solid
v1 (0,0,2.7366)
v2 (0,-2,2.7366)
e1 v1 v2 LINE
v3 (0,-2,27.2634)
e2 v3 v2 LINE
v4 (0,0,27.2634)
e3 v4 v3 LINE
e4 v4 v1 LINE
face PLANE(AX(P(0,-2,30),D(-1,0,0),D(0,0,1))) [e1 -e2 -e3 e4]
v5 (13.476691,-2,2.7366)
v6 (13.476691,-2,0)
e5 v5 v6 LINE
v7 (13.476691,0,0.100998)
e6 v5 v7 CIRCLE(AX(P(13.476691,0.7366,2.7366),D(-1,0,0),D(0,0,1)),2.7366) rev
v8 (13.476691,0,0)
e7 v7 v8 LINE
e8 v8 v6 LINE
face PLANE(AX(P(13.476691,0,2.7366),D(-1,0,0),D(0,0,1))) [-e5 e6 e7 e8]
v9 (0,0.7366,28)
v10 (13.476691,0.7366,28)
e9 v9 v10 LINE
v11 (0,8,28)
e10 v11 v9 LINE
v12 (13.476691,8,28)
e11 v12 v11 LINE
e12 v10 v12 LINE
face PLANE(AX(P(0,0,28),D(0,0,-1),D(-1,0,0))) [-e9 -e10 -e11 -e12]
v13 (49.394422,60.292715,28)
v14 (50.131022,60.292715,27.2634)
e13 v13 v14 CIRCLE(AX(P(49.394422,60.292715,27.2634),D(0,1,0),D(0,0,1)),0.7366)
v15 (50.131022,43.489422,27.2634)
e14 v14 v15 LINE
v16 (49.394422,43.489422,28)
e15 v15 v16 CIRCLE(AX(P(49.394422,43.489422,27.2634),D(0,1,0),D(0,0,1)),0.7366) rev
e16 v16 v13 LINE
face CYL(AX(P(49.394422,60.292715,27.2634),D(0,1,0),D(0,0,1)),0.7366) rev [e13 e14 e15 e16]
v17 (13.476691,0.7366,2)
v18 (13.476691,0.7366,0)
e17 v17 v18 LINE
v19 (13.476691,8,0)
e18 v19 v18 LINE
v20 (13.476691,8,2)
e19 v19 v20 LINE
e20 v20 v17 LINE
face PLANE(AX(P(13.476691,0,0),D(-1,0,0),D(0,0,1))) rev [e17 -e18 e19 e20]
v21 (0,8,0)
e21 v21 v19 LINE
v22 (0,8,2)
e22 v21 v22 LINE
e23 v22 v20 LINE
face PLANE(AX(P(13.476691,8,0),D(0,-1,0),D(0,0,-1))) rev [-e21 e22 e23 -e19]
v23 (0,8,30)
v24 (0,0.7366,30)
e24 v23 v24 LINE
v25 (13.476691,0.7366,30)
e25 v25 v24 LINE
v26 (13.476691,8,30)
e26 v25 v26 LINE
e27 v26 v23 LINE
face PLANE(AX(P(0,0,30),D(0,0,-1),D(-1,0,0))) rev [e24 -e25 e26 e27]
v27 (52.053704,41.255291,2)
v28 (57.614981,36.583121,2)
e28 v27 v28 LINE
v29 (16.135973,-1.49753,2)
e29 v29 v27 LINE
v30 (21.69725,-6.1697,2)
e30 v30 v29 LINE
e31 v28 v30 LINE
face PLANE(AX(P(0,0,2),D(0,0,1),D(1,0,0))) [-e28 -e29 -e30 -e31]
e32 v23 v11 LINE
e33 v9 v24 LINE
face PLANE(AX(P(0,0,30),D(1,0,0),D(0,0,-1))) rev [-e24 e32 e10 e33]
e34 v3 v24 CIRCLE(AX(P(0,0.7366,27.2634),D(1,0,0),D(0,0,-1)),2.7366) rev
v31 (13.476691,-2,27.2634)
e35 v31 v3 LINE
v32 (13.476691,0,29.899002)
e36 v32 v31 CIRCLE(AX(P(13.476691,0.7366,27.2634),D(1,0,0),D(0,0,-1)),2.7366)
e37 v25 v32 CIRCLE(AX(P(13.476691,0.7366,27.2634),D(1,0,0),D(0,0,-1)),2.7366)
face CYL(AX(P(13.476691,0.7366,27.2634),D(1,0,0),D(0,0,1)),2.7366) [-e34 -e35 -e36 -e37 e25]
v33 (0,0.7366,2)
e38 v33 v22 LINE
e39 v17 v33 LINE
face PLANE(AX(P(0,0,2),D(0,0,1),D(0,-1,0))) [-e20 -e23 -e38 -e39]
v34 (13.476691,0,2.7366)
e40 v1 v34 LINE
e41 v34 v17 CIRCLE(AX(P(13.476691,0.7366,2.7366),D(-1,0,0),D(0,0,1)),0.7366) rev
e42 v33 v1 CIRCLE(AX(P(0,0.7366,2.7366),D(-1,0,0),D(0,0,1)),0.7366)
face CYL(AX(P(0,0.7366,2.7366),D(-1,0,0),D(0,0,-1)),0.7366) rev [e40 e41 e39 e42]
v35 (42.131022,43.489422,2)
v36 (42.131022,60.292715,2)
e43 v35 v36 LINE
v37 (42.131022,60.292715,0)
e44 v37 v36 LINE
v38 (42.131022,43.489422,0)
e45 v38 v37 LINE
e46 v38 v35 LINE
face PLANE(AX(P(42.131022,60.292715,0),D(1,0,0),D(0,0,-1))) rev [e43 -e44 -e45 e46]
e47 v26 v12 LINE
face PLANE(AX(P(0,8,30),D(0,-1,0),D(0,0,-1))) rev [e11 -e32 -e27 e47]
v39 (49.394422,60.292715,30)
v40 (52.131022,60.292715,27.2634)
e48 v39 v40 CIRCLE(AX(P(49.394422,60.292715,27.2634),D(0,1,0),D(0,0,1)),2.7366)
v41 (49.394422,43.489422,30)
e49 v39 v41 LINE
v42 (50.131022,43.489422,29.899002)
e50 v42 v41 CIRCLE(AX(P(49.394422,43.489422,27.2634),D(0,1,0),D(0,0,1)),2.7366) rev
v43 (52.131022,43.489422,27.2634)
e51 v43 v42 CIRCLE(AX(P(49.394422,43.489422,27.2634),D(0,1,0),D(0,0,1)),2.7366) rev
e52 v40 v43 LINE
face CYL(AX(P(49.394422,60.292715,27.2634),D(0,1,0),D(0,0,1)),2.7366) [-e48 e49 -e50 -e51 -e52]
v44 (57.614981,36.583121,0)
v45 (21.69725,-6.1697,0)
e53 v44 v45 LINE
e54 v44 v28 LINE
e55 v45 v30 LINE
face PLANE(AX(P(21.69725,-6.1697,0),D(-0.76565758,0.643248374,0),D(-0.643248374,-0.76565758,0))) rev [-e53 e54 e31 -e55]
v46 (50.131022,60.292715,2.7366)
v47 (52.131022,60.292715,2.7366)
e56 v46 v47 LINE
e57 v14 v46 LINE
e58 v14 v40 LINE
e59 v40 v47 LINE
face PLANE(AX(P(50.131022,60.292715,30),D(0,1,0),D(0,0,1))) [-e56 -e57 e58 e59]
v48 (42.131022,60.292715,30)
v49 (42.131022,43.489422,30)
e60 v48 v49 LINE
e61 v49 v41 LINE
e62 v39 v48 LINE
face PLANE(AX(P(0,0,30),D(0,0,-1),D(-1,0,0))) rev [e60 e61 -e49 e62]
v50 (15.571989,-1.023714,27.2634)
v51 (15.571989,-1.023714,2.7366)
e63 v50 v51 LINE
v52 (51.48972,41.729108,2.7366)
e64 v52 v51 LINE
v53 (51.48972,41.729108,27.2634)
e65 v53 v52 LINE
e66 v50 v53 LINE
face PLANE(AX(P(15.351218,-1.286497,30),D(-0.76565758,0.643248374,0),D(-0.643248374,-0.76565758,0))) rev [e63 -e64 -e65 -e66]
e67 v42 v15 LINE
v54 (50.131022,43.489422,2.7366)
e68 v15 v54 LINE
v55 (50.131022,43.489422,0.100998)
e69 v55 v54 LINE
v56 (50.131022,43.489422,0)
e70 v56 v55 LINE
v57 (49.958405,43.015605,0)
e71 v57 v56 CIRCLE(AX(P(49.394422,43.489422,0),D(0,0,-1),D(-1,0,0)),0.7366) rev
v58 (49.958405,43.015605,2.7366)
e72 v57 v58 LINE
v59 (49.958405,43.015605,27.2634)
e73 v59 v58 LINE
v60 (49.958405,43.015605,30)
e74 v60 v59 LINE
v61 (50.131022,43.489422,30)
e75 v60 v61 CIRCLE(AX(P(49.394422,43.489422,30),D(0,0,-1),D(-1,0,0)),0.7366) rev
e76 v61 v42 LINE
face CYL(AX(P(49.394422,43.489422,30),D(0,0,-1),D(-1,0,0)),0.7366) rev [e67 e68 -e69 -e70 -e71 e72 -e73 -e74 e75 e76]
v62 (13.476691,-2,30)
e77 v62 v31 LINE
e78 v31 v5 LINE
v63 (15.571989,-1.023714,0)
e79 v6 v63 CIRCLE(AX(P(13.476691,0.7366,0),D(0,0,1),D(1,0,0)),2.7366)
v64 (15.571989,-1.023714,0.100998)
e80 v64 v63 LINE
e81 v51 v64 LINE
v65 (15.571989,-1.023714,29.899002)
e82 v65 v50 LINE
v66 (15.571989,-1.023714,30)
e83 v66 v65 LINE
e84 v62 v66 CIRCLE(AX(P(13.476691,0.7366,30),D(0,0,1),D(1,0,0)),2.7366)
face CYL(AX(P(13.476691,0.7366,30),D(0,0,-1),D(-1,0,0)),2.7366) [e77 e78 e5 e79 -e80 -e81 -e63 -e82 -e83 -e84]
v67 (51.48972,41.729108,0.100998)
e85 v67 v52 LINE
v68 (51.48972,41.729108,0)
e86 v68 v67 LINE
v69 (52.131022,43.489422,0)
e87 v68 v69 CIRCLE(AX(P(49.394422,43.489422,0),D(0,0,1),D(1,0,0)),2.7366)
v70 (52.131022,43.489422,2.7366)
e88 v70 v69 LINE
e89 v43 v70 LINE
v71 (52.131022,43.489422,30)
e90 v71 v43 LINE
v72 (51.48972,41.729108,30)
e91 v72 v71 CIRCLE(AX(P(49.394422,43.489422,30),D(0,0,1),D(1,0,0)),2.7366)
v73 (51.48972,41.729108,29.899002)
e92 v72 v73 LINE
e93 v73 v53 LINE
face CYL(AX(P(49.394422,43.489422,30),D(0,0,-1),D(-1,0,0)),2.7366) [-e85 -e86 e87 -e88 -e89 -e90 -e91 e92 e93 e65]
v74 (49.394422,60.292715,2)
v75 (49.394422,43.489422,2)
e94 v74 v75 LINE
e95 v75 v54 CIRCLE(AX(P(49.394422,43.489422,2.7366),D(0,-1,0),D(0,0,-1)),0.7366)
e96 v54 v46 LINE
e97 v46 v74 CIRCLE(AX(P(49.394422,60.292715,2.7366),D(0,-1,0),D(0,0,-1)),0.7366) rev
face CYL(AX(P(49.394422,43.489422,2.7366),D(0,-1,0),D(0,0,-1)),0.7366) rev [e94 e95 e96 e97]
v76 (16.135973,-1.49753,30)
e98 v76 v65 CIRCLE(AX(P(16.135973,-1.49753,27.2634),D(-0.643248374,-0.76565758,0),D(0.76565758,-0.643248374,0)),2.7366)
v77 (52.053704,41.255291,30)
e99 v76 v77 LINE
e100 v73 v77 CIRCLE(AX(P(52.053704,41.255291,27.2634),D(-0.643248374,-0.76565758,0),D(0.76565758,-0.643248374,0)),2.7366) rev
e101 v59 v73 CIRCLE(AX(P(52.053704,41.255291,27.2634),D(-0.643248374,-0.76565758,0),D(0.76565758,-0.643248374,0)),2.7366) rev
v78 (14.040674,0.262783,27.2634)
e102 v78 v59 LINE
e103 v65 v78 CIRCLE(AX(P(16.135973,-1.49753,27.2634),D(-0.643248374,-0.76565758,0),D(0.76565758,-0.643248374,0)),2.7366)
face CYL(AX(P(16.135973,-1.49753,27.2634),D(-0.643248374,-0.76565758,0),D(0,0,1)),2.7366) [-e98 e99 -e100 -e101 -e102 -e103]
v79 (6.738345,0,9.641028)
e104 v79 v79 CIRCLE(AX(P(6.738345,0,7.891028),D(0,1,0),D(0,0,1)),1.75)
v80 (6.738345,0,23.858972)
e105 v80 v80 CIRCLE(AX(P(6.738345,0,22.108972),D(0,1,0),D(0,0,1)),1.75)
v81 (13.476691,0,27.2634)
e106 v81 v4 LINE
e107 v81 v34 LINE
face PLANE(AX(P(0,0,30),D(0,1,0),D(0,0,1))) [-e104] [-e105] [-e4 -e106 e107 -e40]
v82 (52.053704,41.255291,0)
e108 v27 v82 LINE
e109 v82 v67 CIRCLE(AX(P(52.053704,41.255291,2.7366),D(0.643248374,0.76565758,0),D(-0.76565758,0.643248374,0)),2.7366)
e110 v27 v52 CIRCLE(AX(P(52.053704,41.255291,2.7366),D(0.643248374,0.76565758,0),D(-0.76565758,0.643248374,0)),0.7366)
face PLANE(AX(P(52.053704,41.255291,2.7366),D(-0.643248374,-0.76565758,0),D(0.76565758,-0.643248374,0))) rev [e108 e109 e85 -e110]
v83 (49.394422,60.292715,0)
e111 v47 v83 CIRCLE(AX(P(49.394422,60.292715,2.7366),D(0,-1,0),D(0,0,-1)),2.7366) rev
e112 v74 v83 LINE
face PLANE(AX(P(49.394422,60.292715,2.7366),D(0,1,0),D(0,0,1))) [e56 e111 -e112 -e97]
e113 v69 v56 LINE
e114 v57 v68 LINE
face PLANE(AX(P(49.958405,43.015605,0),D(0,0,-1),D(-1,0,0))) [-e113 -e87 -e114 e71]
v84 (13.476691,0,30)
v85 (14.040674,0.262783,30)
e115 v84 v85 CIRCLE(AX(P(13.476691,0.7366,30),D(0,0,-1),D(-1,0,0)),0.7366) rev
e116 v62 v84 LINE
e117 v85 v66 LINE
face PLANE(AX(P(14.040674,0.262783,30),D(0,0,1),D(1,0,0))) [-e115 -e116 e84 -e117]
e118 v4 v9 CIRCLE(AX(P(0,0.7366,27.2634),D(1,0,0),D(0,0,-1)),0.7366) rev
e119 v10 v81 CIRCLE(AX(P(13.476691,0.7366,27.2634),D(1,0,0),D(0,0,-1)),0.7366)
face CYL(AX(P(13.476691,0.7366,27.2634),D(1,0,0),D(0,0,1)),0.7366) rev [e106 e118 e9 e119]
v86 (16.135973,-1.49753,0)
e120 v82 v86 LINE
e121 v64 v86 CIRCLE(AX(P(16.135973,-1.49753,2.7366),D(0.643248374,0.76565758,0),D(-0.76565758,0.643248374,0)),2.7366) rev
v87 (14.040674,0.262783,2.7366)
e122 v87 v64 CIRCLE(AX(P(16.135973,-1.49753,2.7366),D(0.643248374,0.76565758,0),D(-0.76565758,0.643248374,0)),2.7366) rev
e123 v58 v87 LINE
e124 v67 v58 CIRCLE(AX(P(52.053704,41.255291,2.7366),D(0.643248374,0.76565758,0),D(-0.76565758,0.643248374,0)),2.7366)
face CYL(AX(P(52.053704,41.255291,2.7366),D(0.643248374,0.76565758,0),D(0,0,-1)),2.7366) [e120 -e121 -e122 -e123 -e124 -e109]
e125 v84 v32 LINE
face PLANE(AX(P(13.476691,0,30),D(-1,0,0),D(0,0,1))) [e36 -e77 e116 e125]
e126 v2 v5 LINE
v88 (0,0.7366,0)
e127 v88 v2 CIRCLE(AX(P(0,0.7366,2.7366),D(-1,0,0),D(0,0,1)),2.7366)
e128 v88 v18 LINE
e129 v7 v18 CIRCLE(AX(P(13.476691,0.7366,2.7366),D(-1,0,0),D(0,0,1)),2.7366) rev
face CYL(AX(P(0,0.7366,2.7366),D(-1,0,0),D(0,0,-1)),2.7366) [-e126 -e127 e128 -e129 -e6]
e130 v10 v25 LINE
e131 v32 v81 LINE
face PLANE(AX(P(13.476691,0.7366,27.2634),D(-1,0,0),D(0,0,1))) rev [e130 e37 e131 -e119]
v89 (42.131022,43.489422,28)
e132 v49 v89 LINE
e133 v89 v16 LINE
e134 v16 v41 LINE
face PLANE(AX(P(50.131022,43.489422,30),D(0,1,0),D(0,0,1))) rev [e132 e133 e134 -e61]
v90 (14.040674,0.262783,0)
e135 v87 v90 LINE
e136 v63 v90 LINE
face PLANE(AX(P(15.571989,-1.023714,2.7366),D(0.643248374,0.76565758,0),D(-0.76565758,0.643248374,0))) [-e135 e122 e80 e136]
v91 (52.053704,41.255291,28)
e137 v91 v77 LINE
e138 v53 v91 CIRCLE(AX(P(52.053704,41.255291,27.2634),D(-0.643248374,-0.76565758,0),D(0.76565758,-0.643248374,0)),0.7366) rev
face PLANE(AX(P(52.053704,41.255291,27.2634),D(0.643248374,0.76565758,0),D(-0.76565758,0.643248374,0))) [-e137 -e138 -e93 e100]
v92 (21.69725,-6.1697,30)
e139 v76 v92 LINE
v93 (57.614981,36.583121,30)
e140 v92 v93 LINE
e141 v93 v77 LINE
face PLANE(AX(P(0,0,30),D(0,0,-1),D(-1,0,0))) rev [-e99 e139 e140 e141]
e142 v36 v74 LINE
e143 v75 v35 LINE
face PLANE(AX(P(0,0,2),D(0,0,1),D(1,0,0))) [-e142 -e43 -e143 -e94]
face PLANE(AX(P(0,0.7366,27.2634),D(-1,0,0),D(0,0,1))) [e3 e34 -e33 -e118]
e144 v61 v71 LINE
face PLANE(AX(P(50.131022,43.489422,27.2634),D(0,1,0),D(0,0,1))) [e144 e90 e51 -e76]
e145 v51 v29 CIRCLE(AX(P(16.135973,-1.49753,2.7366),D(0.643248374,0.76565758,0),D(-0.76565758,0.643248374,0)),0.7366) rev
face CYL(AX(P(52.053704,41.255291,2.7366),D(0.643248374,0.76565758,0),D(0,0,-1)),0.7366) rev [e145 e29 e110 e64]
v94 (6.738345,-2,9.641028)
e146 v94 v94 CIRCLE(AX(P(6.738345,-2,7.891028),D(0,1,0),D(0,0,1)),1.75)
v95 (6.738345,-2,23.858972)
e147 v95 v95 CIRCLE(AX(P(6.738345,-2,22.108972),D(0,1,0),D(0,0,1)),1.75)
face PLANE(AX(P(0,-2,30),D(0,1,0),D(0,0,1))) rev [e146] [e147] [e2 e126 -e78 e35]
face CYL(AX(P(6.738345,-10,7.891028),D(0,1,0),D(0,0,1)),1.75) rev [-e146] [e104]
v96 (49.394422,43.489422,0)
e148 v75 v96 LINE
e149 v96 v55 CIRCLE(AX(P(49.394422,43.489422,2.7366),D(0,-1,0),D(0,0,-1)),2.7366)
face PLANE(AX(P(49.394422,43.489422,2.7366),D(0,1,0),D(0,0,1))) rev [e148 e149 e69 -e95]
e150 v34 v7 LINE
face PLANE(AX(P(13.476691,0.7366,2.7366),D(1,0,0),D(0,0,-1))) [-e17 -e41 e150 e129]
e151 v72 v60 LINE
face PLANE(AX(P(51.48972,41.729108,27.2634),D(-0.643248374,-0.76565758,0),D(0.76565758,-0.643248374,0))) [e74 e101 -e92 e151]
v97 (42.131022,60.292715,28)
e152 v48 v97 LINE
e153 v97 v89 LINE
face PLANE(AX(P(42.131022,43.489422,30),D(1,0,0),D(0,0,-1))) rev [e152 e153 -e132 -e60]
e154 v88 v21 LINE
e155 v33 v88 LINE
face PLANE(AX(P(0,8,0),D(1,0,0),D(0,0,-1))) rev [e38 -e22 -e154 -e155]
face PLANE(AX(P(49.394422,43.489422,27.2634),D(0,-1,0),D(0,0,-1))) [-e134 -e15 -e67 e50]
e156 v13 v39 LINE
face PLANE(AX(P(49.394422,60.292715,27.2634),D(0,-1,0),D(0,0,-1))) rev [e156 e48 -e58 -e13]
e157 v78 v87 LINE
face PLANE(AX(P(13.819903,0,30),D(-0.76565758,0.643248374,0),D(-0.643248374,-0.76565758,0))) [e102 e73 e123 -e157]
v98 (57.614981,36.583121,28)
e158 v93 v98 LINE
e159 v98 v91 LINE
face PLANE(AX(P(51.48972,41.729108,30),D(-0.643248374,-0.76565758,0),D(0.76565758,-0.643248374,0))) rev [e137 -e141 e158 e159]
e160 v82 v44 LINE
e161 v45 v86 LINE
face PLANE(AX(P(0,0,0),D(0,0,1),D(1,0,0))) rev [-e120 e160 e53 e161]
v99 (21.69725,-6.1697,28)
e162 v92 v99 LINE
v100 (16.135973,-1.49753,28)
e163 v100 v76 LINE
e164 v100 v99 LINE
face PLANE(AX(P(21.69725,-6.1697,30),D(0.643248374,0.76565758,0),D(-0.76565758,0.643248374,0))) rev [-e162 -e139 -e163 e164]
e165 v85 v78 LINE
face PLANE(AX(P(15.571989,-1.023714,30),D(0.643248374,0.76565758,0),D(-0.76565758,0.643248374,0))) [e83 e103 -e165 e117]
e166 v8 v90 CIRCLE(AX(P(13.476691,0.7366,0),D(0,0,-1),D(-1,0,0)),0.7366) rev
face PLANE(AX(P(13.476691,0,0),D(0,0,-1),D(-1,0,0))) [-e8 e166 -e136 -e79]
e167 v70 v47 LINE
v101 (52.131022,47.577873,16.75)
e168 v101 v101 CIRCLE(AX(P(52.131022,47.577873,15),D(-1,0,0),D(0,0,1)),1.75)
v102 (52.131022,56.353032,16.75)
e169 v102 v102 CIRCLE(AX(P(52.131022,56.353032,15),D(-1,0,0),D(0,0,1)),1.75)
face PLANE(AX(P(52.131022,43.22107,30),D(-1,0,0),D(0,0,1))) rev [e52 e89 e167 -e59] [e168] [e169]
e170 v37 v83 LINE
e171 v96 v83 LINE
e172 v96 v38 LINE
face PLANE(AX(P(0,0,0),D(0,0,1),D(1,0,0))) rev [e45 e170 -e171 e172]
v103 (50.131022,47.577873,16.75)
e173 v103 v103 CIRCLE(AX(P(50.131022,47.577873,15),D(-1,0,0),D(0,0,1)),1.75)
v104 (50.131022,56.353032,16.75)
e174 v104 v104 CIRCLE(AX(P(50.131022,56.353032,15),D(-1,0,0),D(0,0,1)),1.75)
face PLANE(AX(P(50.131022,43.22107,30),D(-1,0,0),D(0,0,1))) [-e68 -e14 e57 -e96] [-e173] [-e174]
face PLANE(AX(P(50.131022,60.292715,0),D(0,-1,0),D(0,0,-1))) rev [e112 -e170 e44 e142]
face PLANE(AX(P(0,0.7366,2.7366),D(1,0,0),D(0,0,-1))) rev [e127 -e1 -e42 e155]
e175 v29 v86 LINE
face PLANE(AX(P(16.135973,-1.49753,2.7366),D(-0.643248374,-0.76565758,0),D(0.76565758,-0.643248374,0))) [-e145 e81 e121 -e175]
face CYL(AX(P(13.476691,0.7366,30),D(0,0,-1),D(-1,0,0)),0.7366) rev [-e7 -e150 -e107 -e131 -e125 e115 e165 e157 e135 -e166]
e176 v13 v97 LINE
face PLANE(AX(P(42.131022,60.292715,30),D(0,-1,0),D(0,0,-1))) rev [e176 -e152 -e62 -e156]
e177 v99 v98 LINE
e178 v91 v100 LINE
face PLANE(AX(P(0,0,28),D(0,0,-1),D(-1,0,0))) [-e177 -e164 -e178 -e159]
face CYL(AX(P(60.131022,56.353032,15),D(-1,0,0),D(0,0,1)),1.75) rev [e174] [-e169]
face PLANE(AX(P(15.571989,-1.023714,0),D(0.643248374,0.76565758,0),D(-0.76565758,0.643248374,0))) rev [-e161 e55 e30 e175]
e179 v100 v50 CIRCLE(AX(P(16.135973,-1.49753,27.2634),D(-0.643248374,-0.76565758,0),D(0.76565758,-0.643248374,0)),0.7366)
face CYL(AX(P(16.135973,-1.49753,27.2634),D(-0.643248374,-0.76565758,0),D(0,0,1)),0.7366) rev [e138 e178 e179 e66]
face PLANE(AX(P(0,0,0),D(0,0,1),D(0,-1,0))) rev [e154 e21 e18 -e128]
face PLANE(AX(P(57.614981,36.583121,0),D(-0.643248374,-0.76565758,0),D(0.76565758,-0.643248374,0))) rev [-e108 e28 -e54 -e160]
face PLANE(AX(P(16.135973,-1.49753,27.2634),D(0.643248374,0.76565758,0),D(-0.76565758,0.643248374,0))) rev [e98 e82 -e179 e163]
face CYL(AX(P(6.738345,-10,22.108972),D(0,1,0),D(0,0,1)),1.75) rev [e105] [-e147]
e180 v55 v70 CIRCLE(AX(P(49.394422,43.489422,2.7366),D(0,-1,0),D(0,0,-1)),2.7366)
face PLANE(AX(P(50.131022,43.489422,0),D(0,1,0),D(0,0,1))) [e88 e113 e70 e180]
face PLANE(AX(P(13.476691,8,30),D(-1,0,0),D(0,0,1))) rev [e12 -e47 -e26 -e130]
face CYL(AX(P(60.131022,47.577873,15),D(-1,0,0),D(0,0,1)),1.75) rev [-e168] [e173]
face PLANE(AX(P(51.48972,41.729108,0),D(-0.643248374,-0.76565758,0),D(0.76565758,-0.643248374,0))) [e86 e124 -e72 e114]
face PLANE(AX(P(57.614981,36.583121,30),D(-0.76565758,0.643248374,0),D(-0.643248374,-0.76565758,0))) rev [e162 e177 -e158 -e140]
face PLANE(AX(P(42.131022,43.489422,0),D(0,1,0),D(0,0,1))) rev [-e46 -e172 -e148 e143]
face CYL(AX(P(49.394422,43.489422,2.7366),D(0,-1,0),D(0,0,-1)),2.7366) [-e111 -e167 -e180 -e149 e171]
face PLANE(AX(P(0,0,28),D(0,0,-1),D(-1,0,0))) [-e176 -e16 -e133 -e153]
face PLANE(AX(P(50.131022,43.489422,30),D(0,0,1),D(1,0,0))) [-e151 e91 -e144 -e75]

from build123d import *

# Parameters (mm, degrees)
BASE_FLANGE1_DEPTH             = 30
EDGE_FLANGE1_STRIP_W           = 9.4732
EDGE_FLANGE1_STRIP_H           = 2
EDGE_FLANGE1_STRIP_CUT_DEPTH   = 16.803293835
EDGE_FLANGE1_STRIP_2_W         = 9.4732
EDGE_FLANGE1_STRIP_2_H         = 2
EDGE_FLANGE1_STRIP_CUT_2_DEPTH = 13.476690823
EDGE_FLANGE1_STRIP_3_W         = 9.4732
EDGE_FLANGE1_STRIP_3_H         = 2
EDGE_FLANGE1_STRIP_CUT_3_DEPTH = 16.803293835
EDGE_FLANGE1_STRIP_4_W         = 9.4732
EDGE_FLANGE1_STRIP_4_H         = 2
EDGE_FLANGE1_STRIP_CUT_4_DEPTH = 13.476690823
EDGE_FLANGE1_DEPTH             = 16.803293835
EDGE_FLANGE1_BEND_DEPTH        = 13.476690823
EDGE_FLANGE1_BEND_2_DEPTH      = 16.803293835
EDGE_FLANGE1_BEND_3_DEPTH      = 13.476690823
EDGE_FLANGE2_STRIP_W           = 9.4732
EDGE_FLANGE2_STRIP_H           = 2
EDGE_FLANGE2_STRIP_CUT_DEPTH   = 55.838043997
EDGE_FLANGE2_STRIP_2_W         = 9.4732
EDGE_FLANGE2_STRIP_2_H         = 2
EDGE_FLANGE2_STRIP_CUT_2_DEPTH = 55.838043997
EDGE_FLANGE2_DEPTH             = 55.838043997
EDGE_FLANGE2_BEND_DEPTH        = 55.838043997
SKETCH32_R                     = 1.75
CUT_EXTRUDE1_DEPTH             = 10
SKETCH33_R                     = 1.75
CUT_EXTRUDE2_DEPTH             = 10


# Sheet-metal steps are written as plain solids
with BuildPart() as part:
    # Sketch1 → Base-Flange1 (new body)
    with BuildSketch(Plane.XY):
        with BuildLine():
            Line((0, 0), (13.476690823, 0))
            ThreePointArc((13.476690823, 0), (13.787790598, 0.068920069), (14.040674196, 0.262783248))
            Line((14.040674196, 0.262783248), (49.95840521, 43.015604865))
            ThreePointArc((49.95840521, 43.015604865), (50.086523604, 43.237281371), (50.131021837, 43.489421617))
            Line((50.131021837, 43.489421617), (50.131021837, 60.292715453))
            Line((50.131021837, 60.292715453), (52.131021837, 60.292715453))
            Line((52.131021837, 60.292715453), (52.131021837, 43.489421617))
            ThreePointArc((52.131021837, 43.489421617), (51.965702989, 42.552675762), (51.489720369, 41.729108117))
            Line((51.489720369, 41.729108117), (15.571989355, -1.023713501))
            ThreePointArc((15.571989355, -1.023713501), (14.632481815, -1.743949686), (13.476690823, -2))
            Line((13.476690823, -2), (0, -2))
            Line((0, -2), (0, 0))
        make_face()
    extrude(amount=BASE_FLANGE1_DEPTH)

    # Edge-Flange1 strip (across the edge) → Edge-Flange1 strip cut (cut)
    with BuildSketch(Plane(origin=(50.131021837, 43.489421617, 30), x_dir=(0, 0, -1), z_dir=(0, 1, 0))):
        with Locations((-2, -1)):
            Rectangle(EDGE_FLANGE1_STRIP_W, EDGE_FLANGE1_STRIP_H)
    extrude(amount=EDGE_FLANGE1_STRIP_CUT_DEPTH, mode=Mode.SUBTRACT)

    # Edge-Flange1 strip 2 (across the edge) → Edge-Flange1 strip cut 2 (cut)
    with BuildSketch(Plane(origin=(0, 0, 30), x_dir=(0, 0, -1), z_dir=(1, 0, 0))):
        with Locations((-2, -1)):
            Rectangle(EDGE_FLANGE1_STRIP_2_W, EDGE_FLANGE1_STRIP_2_H)
    extrude(amount=EDGE_FLANGE1_STRIP_CUT_2_DEPTH, mode=Mode.SUBTRACT)

    # Edge-Flange1 strip 3 (across the edge) → Edge-Flange1 strip cut 3 (cut)
    with BuildSketch(Plane(origin=(50.131021837, 60.292715453, 0), x_dir=(0, 0, 1), z_dir=(0, -1, 0))):
        with Locations((-2, -1)):
            Rectangle(EDGE_FLANGE1_STRIP_3_W, EDGE_FLANGE1_STRIP_3_H)
    extrude(amount=EDGE_FLANGE1_STRIP_CUT_3_DEPTH, mode=Mode.SUBTRACT)

    # Edge-Flange1 strip 4 (across the edge) → Edge-Flange1 strip cut 4 (cut)
    with BuildSketch(Plane.ZY.offset(-13.476690823)):
        with Locations((-2, -1)):
            Rectangle(EDGE_FLANGE1_STRIP_4_W, EDGE_FLANGE1_STRIP_4_H)
    extrude(amount=EDGE_FLANGE1_STRIP_CUT_4_DEPTH, mode=Mode.SUBTRACT)

    # Edge-Flange1 section (across the edge) → Edge-Flange1 (add)
    with BuildSketch(Plane(origin=(50.131021837, 43.489421617, 30), x_dir=(0, 0, -1), z_dir=(0, 1, 0))):
        with BuildLine():
            Line((0, 0.7366), (0, 8))
            Line((0, 8), (2, 8))
            Line((2, 8), (2, 0.7366))
            ThreePointArc((2, 0.7366), (2.215745145, 0.215745145), (2.7366, 0))
            Line((2.7366, 0), (2.7366, -2))
            ThreePointArc((2.7366, -2), (0.801531583, -1.198468417), (0, 0.7366))
        make_face()
    extrude(amount=EDGE_FLANGE1_DEPTH)

    # Edge-Flange1 section 2 (across the edge) → Edge-Flange1 bend (add)
    with BuildSketch(Plane(origin=(0, 0, 30), x_dir=(0, 0, -1), z_dir=(1, 0, 0))):
        with BuildLine():
            Line((0, 0.7366), (0, 8))
            Line((0, 8), (2, 8))
            Line((2, 8), (2, 0.7366))
            ThreePointArc((2, 0.7366), (2.215745145, 0.215745145), (2.7366, 0))
            Line((2.7366, 0), (2.7366, -2))
            ThreePointArc((2.7366, -2), (0.801531583, -1.198468417), (0, 0.7366))
        make_face()
    extrude(amount=EDGE_FLANGE1_BEND_DEPTH)

    # Edge-Flange1 section 3 (across the edge) → Edge-Flange1 bend 2 (add)
    with BuildSketch(Plane(origin=(50.131021837, 60.292715453, 0), x_dir=(0, 0, 1), z_dir=(0, -1, 0))):
        with BuildLine():
            Line((0, 0.7366), (0, 8))
            Line((0, 8), (2, 8))
            Line((2, 8), (2, 0.7366))
            ThreePointArc((2, 0.7366), (2.215745145, 0.215745145), (2.7366, 0))
            Line((2.7366, 0), (2.7366, -2))
            ThreePointArc((2.7366, -2), (0.801531583, -1.198468417), (0, 0.7366))
        make_face()
    extrude(amount=EDGE_FLANGE1_BEND_2_DEPTH)

    # Edge-Flange1 section 4 (across the edge) → Edge-Flange1 bend 3 (add)
    with BuildSketch(Plane.ZY.offset(-13.476690823)):
        with BuildLine():
            Line((0, 0.7366), (0, 8))
            Line((0, 8), (2, 8))
            Line((2, 8), (2, 0.7366))
            ThreePointArc((2, 0.7366), (2.215745145, 0.215745145), (2.7366, 0))
            Line((2.7366, 0), (2.7366, -2))
            ThreePointArc((2.7366, -2), (0.801531583, -1.198468417), (0, 0.7366))
        make_face()
    extrude(amount=EDGE_FLANGE1_BEND_3_DEPTH)

    # Edge-Flange2 strip (across the edge) → Edge-Flange2 strip cut (cut)
    with BuildSketch(Plane(origin=(51.489720369, 41.729108117, 30), x_dir=(0, 0, -1), z_dir=(-0.6432483740966664, -0.7656575796150621, 0))):
        with Locations((-2, -1)):
            Rectangle(EDGE_FLANGE2_STRIP_W, EDGE_FLANGE2_STRIP_H)
    extrude(amount=EDGE_FLANGE2_STRIP_CUT_DEPTH, mode=Mode.SUBTRACT)

    # Edge-Flange2 strip 2 (across the edge) → Edge-Flange2 strip cut 2 (cut)
    with BuildSketch(Plane(origin=(15.571989355, -1.023713501, 0), x_dir=(0, 0, 1), z_dir=(0.6432483740966664, 0.7656575796150621, 0))):
        with Locations((-2, -1)):
            Rectangle(EDGE_FLANGE2_STRIP_2_W, EDGE_FLANGE2_STRIP_2_H)
    extrude(amount=EDGE_FLANGE2_STRIP_CUT_2_DEPTH, mode=Mode.SUBTRACT)

    # Edge-Flange2 section (across the edge) → Edge-Flange2 (add)
    with BuildSketch(Plane(origin=(51.489720369, 41.729108117, 30), x_dir=(0, 0, -1), z_dir=(-0.6432483740966664, -0.7656575796150621, 0))):
        with BuildLine():
            Line((0, 0.7366), (0, 8))
            Line((0, 8), (2, 8))
            Line((2, 8), (2, 0.7366))
            ThreePointArc((2, 0.7366), (2.215745145, 0.215745145), (2.7366, 0))
            Line((2.7366, 0), (2.7366, -2))
            ThreePointArc((2.7366, -2), (0.801531583, -1.198468417), (0, 0.7366))
        make_face()
    extrude(amount=EDGE_FLANGE2_DEPTH)

    # Edge-Flange2 section 2 (across the edge) → Edge-Flange2 bend (add)
    with BuildSketch(Plane(origin=(15.571989355, -1.023713501, 0), x_dir=(0, 0, 1), z_dir=(0.6432483740966664, 0.7656575796150621, 0))):
        with BuildLine():
            Line((0, 0.7366), (0, 8))
            Line((0, 8), (2, 8))
            Line((2, 8), (2, 0.7366))
            ThreePointArc((2, 0.7366), (2.215745145, 0.215745145), (2.7366, 0))
            Line((2.7366, 0), (2.7366, -2))
            ThreePointArc((2.7366, -2), (0.801531583, -1.198468417), (0, 0.7366))
        make_face()
    extrude(amount=EDGE_FLANGE2_BEND_DEPTH)

    # Sketch32 → Cut-Extrude1 (cut)
    with BuildSketch(Plane(origin=(0, 0, 0), x_dir=(1, 0, 0), z_dir=(0, 1, 0))):
        with Locations(Location((6.738345411, -7.891027615, 0), (0, 0, 270))):
            Circle(SKETCH32_R)
        with Locations(Location((6.738345411, -22.108972385, 0), (0, 0, 270))):
            Circle(SKETCH32_R)
    extrude(amount=-CUT_EXTRUDE1_DEPTH, mode=Mode.SUBTRACT)

    # Sketch33 → Cut-Extrude2 (cut)
    with BuildSketch(Plane.ZY.offset(-50.131021837)):
        with Locations((15, 56.35303153)):
            Circle(SKETCH33_R)
        with Locations((15, 47.577872809)):
            Circle(SKETCH33_R)
    extrude(amount=-CUT_EXTRUDE2_DEPTH, mode=Mode.SUBTRACT)


solid = part.part
